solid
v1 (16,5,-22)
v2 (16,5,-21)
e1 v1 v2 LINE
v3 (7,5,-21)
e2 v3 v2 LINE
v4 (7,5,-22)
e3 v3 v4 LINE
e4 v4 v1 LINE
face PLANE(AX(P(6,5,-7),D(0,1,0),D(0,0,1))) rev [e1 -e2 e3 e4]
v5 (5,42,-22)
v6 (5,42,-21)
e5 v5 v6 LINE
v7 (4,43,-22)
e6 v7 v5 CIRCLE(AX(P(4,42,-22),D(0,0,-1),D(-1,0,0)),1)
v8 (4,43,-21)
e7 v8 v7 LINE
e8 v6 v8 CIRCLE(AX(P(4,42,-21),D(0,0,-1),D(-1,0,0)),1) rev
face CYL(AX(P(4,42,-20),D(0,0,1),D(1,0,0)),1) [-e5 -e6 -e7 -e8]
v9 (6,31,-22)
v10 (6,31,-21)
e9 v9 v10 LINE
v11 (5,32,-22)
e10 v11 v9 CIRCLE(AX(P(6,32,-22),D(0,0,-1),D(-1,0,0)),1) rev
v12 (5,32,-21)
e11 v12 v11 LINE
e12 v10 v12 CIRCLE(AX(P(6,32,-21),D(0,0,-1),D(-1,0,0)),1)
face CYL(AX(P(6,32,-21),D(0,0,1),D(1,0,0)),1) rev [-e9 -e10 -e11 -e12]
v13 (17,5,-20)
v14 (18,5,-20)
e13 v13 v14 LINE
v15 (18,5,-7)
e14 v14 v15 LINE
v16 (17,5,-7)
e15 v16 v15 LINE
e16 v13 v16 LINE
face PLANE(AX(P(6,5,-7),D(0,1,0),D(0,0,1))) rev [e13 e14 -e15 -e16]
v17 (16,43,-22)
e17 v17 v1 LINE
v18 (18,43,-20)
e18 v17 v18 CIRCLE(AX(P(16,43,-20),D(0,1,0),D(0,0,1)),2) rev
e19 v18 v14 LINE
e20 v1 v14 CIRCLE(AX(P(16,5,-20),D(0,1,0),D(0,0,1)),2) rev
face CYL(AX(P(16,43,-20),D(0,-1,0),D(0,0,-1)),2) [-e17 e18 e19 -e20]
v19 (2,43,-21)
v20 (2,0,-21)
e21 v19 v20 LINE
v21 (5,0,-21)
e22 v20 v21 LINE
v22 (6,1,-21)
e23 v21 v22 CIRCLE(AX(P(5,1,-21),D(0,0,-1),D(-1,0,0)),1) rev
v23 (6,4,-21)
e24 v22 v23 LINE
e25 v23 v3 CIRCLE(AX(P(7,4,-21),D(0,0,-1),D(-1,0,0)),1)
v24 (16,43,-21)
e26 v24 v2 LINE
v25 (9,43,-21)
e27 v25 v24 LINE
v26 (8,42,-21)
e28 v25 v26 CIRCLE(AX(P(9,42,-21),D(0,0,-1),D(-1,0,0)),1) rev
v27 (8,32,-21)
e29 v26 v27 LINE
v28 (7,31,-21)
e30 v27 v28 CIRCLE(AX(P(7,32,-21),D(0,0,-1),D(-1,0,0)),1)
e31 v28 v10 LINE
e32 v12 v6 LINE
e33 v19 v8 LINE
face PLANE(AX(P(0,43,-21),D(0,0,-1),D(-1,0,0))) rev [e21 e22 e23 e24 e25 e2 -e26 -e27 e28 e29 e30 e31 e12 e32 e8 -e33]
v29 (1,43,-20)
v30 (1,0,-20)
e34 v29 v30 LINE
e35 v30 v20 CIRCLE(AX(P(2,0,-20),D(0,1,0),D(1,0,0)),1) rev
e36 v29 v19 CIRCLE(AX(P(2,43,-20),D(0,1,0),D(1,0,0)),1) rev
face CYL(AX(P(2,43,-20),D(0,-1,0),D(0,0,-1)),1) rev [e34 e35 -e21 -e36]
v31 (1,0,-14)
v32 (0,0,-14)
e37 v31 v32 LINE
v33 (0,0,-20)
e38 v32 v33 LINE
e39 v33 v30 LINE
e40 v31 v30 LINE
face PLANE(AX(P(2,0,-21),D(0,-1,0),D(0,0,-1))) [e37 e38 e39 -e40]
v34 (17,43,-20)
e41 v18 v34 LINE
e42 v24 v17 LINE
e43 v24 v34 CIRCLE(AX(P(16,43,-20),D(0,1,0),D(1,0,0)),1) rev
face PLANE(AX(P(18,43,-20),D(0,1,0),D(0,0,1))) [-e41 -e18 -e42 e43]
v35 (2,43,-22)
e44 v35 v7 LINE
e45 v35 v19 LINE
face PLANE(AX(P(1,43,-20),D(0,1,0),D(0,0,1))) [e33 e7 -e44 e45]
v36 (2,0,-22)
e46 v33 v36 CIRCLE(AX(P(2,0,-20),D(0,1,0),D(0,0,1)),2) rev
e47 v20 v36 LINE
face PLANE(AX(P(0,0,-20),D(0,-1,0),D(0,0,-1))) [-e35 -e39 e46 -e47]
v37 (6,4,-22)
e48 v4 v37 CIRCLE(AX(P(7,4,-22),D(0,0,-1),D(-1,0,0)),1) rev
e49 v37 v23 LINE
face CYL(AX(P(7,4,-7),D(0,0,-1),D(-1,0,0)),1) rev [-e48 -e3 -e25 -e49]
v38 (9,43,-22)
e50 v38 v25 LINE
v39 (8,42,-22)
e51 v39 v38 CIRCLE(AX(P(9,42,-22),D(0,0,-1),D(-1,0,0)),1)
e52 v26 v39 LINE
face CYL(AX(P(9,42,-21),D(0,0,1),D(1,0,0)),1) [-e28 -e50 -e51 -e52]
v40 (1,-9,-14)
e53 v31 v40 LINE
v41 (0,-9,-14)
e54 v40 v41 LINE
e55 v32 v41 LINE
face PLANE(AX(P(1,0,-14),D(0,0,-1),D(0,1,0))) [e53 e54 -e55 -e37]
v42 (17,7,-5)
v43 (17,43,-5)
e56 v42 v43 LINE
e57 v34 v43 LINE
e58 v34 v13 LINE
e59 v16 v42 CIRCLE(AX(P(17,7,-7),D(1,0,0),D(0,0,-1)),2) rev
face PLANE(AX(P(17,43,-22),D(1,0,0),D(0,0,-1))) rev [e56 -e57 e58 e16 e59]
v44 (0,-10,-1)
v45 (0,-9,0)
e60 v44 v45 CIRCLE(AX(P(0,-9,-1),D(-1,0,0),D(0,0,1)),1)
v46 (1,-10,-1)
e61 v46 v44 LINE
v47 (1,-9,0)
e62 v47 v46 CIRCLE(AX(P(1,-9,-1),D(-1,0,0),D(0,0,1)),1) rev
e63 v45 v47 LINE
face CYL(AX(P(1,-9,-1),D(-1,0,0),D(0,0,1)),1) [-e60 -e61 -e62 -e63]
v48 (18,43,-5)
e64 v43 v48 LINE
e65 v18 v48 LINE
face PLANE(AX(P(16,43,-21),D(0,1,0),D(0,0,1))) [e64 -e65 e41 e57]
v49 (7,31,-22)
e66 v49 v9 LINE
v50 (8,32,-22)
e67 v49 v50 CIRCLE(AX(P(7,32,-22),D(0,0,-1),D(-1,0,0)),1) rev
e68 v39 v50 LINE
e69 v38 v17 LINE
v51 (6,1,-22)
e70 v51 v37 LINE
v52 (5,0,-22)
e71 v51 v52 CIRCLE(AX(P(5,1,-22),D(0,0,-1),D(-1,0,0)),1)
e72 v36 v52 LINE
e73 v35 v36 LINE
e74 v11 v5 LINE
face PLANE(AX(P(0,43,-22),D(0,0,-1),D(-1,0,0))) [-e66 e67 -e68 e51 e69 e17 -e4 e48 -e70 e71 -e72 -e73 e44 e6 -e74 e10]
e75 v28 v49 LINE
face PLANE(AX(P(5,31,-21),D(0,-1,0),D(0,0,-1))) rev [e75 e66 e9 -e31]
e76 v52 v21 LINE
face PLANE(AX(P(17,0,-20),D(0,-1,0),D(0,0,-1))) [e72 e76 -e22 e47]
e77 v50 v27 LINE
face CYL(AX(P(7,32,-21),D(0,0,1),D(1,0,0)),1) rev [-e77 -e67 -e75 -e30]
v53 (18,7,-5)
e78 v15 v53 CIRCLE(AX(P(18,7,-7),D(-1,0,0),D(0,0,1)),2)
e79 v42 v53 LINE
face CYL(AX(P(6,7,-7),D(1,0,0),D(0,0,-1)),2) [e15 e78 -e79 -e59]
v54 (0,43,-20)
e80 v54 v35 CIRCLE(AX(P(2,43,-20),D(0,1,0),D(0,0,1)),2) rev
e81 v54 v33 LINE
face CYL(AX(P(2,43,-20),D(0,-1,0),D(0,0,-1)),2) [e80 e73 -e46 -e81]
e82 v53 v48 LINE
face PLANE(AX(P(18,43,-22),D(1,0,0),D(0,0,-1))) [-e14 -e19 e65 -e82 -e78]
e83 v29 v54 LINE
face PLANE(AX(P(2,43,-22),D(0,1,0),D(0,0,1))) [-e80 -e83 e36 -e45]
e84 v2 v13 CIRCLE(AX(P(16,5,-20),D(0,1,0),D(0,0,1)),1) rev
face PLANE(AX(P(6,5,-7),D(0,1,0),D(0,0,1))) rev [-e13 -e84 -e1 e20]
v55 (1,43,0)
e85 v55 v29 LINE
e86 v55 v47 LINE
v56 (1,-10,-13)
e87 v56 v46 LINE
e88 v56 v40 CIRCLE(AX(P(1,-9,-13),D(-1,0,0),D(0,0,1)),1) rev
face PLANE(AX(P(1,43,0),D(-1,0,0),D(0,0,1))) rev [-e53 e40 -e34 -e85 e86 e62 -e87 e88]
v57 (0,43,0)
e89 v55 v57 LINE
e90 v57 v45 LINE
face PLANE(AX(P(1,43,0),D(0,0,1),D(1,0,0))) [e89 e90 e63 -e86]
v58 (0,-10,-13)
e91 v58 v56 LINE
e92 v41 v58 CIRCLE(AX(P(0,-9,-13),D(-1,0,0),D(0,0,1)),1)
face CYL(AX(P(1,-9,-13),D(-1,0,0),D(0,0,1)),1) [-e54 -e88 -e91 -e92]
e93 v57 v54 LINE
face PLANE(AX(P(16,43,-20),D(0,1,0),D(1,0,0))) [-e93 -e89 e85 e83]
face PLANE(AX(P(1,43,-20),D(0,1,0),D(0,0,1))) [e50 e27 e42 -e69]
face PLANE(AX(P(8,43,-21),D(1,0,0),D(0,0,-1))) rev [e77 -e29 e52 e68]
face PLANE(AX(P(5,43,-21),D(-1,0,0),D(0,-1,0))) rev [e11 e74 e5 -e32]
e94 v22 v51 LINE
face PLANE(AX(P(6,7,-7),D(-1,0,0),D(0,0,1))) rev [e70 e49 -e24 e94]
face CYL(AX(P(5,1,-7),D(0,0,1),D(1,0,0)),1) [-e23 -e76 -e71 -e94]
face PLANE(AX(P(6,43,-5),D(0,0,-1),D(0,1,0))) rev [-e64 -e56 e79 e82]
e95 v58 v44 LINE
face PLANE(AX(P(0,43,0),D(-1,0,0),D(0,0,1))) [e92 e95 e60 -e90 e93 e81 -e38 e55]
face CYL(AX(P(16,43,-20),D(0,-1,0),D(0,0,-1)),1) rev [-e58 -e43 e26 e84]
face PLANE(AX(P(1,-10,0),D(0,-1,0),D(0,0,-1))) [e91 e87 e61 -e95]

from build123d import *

# Parameters (mm, degrees)
SM_BASE_FLANGE_1_DEPTH   = 43
SKETCH_6_W               = 14
SKETCH_6_H               = 10
SM_BASE_FLANGE_1_2_DEPTH = 1
SKETCH_9_W               = 3
SKETCH_9_H               = 12
CUT_EXTRUDE_1_DEPTH      = 10
CUT_EXTRUDE_2_DEPTH      = 12
FILLET_1_R               = 1


# Sheet-metal steps are written as plain solids
with BuildPart() as part:
    # Sketch 1 → Sm Base Flange 1 (new body)
    with BuildSketch(Plane(origin=(0, 0, 0), x_dir=(1, 0, 0), z_dir=(0, 1, 0))):
        with BuildLine():
            Line((0, 0), (0, 20))
            ThreePointArc((0, 20), (0.585786438, 21.414213562), (2, 22))
            Line((2, 22), (16, 22))
            ThreePointArc((16, 22), (17.414213562, 21.414213562), (18, 20))
            Line((18, 20), (18, 0))
            Line((18, 0), (17, 0))
            Line((17, 0), (17, 20))
            ThreePointArc((17, 20), (16.707106781, 20.707106781), (16, 21))
            Line((16, 21), (2, 21))
            ThreePointArc((2, 21), (1.292893219, 20.707106781), (1, 20))
            Line((1, 20), (1, 0))
            Line((1, 0), (0, 0))
        make_face()
    extrude(amount=SM_BASE_FLANGE_1_DEPTH)

    # Эскиз6 → Sm Base Flange 1 2 (add)
    with BuildSketch(Plane.ZY):
        with Locations((-7, -5)):
            Rectangle(SKETCH_6_W, SKETCH_6_H)
    extrude(amount=-SM_BASE_FLANGE_1_2_DEPTH)

    # Эскиз9 → Вырез-Вытянуть1 (cut)
    with BuildSketch(Plane(origin=(0, 0, -22), x_dir=(-1, 0, 0), z_dir=(0, 0, -1))):
        with Locations((-6.5, 37)):
            Rectangle(SKETCH_9_W, SKETCH_9_H)
    extrude(amount=-CUT_EXTRUDE_1_DEPTH, mode=Mode.SUBTRACT)

    # Эскиз10 → Вырез-Вытянуть2 (cut)
    with BuildSketch(Plane(origin=(18, 0, 0), x_dir=(0, 0, -1), z_dir=(1, 0, 0))):
        with BuildLine():
            Line((0, 43), (5, 43))
            Line((5, 43), (5, 7))
            ThreePointArc((5, 7), (5.585786438, 5.585786438), (7, 5))
            Line((7, 5), (22, 5))
            Line((22, 5), (22, 0))
            Line((22, 0), (0, 0))
            Line((0, 0), (0, 43))
        make_face()
    extrude(amount=-CUT_EXTRUDE_2_DEPTH, mode=Mode.SUBTRACT)

    # Скругление1
    fillet_1_edges = [part.edges().sort_by_distance(p)[0] for p in [
        (6, 0, -21.5),
        (6, 5, -21.5),
        (0.5, -10, 0),
        (0.5, -10, -14),
        (5, 43, -21.5),
        (5, 31, -21.5),
        (8, 31, -21.5),
        (8, 43, -21.5),
    ]]
    fillet(fillet_1_edges, radius=FILLET_1_R)


solid = part.part
